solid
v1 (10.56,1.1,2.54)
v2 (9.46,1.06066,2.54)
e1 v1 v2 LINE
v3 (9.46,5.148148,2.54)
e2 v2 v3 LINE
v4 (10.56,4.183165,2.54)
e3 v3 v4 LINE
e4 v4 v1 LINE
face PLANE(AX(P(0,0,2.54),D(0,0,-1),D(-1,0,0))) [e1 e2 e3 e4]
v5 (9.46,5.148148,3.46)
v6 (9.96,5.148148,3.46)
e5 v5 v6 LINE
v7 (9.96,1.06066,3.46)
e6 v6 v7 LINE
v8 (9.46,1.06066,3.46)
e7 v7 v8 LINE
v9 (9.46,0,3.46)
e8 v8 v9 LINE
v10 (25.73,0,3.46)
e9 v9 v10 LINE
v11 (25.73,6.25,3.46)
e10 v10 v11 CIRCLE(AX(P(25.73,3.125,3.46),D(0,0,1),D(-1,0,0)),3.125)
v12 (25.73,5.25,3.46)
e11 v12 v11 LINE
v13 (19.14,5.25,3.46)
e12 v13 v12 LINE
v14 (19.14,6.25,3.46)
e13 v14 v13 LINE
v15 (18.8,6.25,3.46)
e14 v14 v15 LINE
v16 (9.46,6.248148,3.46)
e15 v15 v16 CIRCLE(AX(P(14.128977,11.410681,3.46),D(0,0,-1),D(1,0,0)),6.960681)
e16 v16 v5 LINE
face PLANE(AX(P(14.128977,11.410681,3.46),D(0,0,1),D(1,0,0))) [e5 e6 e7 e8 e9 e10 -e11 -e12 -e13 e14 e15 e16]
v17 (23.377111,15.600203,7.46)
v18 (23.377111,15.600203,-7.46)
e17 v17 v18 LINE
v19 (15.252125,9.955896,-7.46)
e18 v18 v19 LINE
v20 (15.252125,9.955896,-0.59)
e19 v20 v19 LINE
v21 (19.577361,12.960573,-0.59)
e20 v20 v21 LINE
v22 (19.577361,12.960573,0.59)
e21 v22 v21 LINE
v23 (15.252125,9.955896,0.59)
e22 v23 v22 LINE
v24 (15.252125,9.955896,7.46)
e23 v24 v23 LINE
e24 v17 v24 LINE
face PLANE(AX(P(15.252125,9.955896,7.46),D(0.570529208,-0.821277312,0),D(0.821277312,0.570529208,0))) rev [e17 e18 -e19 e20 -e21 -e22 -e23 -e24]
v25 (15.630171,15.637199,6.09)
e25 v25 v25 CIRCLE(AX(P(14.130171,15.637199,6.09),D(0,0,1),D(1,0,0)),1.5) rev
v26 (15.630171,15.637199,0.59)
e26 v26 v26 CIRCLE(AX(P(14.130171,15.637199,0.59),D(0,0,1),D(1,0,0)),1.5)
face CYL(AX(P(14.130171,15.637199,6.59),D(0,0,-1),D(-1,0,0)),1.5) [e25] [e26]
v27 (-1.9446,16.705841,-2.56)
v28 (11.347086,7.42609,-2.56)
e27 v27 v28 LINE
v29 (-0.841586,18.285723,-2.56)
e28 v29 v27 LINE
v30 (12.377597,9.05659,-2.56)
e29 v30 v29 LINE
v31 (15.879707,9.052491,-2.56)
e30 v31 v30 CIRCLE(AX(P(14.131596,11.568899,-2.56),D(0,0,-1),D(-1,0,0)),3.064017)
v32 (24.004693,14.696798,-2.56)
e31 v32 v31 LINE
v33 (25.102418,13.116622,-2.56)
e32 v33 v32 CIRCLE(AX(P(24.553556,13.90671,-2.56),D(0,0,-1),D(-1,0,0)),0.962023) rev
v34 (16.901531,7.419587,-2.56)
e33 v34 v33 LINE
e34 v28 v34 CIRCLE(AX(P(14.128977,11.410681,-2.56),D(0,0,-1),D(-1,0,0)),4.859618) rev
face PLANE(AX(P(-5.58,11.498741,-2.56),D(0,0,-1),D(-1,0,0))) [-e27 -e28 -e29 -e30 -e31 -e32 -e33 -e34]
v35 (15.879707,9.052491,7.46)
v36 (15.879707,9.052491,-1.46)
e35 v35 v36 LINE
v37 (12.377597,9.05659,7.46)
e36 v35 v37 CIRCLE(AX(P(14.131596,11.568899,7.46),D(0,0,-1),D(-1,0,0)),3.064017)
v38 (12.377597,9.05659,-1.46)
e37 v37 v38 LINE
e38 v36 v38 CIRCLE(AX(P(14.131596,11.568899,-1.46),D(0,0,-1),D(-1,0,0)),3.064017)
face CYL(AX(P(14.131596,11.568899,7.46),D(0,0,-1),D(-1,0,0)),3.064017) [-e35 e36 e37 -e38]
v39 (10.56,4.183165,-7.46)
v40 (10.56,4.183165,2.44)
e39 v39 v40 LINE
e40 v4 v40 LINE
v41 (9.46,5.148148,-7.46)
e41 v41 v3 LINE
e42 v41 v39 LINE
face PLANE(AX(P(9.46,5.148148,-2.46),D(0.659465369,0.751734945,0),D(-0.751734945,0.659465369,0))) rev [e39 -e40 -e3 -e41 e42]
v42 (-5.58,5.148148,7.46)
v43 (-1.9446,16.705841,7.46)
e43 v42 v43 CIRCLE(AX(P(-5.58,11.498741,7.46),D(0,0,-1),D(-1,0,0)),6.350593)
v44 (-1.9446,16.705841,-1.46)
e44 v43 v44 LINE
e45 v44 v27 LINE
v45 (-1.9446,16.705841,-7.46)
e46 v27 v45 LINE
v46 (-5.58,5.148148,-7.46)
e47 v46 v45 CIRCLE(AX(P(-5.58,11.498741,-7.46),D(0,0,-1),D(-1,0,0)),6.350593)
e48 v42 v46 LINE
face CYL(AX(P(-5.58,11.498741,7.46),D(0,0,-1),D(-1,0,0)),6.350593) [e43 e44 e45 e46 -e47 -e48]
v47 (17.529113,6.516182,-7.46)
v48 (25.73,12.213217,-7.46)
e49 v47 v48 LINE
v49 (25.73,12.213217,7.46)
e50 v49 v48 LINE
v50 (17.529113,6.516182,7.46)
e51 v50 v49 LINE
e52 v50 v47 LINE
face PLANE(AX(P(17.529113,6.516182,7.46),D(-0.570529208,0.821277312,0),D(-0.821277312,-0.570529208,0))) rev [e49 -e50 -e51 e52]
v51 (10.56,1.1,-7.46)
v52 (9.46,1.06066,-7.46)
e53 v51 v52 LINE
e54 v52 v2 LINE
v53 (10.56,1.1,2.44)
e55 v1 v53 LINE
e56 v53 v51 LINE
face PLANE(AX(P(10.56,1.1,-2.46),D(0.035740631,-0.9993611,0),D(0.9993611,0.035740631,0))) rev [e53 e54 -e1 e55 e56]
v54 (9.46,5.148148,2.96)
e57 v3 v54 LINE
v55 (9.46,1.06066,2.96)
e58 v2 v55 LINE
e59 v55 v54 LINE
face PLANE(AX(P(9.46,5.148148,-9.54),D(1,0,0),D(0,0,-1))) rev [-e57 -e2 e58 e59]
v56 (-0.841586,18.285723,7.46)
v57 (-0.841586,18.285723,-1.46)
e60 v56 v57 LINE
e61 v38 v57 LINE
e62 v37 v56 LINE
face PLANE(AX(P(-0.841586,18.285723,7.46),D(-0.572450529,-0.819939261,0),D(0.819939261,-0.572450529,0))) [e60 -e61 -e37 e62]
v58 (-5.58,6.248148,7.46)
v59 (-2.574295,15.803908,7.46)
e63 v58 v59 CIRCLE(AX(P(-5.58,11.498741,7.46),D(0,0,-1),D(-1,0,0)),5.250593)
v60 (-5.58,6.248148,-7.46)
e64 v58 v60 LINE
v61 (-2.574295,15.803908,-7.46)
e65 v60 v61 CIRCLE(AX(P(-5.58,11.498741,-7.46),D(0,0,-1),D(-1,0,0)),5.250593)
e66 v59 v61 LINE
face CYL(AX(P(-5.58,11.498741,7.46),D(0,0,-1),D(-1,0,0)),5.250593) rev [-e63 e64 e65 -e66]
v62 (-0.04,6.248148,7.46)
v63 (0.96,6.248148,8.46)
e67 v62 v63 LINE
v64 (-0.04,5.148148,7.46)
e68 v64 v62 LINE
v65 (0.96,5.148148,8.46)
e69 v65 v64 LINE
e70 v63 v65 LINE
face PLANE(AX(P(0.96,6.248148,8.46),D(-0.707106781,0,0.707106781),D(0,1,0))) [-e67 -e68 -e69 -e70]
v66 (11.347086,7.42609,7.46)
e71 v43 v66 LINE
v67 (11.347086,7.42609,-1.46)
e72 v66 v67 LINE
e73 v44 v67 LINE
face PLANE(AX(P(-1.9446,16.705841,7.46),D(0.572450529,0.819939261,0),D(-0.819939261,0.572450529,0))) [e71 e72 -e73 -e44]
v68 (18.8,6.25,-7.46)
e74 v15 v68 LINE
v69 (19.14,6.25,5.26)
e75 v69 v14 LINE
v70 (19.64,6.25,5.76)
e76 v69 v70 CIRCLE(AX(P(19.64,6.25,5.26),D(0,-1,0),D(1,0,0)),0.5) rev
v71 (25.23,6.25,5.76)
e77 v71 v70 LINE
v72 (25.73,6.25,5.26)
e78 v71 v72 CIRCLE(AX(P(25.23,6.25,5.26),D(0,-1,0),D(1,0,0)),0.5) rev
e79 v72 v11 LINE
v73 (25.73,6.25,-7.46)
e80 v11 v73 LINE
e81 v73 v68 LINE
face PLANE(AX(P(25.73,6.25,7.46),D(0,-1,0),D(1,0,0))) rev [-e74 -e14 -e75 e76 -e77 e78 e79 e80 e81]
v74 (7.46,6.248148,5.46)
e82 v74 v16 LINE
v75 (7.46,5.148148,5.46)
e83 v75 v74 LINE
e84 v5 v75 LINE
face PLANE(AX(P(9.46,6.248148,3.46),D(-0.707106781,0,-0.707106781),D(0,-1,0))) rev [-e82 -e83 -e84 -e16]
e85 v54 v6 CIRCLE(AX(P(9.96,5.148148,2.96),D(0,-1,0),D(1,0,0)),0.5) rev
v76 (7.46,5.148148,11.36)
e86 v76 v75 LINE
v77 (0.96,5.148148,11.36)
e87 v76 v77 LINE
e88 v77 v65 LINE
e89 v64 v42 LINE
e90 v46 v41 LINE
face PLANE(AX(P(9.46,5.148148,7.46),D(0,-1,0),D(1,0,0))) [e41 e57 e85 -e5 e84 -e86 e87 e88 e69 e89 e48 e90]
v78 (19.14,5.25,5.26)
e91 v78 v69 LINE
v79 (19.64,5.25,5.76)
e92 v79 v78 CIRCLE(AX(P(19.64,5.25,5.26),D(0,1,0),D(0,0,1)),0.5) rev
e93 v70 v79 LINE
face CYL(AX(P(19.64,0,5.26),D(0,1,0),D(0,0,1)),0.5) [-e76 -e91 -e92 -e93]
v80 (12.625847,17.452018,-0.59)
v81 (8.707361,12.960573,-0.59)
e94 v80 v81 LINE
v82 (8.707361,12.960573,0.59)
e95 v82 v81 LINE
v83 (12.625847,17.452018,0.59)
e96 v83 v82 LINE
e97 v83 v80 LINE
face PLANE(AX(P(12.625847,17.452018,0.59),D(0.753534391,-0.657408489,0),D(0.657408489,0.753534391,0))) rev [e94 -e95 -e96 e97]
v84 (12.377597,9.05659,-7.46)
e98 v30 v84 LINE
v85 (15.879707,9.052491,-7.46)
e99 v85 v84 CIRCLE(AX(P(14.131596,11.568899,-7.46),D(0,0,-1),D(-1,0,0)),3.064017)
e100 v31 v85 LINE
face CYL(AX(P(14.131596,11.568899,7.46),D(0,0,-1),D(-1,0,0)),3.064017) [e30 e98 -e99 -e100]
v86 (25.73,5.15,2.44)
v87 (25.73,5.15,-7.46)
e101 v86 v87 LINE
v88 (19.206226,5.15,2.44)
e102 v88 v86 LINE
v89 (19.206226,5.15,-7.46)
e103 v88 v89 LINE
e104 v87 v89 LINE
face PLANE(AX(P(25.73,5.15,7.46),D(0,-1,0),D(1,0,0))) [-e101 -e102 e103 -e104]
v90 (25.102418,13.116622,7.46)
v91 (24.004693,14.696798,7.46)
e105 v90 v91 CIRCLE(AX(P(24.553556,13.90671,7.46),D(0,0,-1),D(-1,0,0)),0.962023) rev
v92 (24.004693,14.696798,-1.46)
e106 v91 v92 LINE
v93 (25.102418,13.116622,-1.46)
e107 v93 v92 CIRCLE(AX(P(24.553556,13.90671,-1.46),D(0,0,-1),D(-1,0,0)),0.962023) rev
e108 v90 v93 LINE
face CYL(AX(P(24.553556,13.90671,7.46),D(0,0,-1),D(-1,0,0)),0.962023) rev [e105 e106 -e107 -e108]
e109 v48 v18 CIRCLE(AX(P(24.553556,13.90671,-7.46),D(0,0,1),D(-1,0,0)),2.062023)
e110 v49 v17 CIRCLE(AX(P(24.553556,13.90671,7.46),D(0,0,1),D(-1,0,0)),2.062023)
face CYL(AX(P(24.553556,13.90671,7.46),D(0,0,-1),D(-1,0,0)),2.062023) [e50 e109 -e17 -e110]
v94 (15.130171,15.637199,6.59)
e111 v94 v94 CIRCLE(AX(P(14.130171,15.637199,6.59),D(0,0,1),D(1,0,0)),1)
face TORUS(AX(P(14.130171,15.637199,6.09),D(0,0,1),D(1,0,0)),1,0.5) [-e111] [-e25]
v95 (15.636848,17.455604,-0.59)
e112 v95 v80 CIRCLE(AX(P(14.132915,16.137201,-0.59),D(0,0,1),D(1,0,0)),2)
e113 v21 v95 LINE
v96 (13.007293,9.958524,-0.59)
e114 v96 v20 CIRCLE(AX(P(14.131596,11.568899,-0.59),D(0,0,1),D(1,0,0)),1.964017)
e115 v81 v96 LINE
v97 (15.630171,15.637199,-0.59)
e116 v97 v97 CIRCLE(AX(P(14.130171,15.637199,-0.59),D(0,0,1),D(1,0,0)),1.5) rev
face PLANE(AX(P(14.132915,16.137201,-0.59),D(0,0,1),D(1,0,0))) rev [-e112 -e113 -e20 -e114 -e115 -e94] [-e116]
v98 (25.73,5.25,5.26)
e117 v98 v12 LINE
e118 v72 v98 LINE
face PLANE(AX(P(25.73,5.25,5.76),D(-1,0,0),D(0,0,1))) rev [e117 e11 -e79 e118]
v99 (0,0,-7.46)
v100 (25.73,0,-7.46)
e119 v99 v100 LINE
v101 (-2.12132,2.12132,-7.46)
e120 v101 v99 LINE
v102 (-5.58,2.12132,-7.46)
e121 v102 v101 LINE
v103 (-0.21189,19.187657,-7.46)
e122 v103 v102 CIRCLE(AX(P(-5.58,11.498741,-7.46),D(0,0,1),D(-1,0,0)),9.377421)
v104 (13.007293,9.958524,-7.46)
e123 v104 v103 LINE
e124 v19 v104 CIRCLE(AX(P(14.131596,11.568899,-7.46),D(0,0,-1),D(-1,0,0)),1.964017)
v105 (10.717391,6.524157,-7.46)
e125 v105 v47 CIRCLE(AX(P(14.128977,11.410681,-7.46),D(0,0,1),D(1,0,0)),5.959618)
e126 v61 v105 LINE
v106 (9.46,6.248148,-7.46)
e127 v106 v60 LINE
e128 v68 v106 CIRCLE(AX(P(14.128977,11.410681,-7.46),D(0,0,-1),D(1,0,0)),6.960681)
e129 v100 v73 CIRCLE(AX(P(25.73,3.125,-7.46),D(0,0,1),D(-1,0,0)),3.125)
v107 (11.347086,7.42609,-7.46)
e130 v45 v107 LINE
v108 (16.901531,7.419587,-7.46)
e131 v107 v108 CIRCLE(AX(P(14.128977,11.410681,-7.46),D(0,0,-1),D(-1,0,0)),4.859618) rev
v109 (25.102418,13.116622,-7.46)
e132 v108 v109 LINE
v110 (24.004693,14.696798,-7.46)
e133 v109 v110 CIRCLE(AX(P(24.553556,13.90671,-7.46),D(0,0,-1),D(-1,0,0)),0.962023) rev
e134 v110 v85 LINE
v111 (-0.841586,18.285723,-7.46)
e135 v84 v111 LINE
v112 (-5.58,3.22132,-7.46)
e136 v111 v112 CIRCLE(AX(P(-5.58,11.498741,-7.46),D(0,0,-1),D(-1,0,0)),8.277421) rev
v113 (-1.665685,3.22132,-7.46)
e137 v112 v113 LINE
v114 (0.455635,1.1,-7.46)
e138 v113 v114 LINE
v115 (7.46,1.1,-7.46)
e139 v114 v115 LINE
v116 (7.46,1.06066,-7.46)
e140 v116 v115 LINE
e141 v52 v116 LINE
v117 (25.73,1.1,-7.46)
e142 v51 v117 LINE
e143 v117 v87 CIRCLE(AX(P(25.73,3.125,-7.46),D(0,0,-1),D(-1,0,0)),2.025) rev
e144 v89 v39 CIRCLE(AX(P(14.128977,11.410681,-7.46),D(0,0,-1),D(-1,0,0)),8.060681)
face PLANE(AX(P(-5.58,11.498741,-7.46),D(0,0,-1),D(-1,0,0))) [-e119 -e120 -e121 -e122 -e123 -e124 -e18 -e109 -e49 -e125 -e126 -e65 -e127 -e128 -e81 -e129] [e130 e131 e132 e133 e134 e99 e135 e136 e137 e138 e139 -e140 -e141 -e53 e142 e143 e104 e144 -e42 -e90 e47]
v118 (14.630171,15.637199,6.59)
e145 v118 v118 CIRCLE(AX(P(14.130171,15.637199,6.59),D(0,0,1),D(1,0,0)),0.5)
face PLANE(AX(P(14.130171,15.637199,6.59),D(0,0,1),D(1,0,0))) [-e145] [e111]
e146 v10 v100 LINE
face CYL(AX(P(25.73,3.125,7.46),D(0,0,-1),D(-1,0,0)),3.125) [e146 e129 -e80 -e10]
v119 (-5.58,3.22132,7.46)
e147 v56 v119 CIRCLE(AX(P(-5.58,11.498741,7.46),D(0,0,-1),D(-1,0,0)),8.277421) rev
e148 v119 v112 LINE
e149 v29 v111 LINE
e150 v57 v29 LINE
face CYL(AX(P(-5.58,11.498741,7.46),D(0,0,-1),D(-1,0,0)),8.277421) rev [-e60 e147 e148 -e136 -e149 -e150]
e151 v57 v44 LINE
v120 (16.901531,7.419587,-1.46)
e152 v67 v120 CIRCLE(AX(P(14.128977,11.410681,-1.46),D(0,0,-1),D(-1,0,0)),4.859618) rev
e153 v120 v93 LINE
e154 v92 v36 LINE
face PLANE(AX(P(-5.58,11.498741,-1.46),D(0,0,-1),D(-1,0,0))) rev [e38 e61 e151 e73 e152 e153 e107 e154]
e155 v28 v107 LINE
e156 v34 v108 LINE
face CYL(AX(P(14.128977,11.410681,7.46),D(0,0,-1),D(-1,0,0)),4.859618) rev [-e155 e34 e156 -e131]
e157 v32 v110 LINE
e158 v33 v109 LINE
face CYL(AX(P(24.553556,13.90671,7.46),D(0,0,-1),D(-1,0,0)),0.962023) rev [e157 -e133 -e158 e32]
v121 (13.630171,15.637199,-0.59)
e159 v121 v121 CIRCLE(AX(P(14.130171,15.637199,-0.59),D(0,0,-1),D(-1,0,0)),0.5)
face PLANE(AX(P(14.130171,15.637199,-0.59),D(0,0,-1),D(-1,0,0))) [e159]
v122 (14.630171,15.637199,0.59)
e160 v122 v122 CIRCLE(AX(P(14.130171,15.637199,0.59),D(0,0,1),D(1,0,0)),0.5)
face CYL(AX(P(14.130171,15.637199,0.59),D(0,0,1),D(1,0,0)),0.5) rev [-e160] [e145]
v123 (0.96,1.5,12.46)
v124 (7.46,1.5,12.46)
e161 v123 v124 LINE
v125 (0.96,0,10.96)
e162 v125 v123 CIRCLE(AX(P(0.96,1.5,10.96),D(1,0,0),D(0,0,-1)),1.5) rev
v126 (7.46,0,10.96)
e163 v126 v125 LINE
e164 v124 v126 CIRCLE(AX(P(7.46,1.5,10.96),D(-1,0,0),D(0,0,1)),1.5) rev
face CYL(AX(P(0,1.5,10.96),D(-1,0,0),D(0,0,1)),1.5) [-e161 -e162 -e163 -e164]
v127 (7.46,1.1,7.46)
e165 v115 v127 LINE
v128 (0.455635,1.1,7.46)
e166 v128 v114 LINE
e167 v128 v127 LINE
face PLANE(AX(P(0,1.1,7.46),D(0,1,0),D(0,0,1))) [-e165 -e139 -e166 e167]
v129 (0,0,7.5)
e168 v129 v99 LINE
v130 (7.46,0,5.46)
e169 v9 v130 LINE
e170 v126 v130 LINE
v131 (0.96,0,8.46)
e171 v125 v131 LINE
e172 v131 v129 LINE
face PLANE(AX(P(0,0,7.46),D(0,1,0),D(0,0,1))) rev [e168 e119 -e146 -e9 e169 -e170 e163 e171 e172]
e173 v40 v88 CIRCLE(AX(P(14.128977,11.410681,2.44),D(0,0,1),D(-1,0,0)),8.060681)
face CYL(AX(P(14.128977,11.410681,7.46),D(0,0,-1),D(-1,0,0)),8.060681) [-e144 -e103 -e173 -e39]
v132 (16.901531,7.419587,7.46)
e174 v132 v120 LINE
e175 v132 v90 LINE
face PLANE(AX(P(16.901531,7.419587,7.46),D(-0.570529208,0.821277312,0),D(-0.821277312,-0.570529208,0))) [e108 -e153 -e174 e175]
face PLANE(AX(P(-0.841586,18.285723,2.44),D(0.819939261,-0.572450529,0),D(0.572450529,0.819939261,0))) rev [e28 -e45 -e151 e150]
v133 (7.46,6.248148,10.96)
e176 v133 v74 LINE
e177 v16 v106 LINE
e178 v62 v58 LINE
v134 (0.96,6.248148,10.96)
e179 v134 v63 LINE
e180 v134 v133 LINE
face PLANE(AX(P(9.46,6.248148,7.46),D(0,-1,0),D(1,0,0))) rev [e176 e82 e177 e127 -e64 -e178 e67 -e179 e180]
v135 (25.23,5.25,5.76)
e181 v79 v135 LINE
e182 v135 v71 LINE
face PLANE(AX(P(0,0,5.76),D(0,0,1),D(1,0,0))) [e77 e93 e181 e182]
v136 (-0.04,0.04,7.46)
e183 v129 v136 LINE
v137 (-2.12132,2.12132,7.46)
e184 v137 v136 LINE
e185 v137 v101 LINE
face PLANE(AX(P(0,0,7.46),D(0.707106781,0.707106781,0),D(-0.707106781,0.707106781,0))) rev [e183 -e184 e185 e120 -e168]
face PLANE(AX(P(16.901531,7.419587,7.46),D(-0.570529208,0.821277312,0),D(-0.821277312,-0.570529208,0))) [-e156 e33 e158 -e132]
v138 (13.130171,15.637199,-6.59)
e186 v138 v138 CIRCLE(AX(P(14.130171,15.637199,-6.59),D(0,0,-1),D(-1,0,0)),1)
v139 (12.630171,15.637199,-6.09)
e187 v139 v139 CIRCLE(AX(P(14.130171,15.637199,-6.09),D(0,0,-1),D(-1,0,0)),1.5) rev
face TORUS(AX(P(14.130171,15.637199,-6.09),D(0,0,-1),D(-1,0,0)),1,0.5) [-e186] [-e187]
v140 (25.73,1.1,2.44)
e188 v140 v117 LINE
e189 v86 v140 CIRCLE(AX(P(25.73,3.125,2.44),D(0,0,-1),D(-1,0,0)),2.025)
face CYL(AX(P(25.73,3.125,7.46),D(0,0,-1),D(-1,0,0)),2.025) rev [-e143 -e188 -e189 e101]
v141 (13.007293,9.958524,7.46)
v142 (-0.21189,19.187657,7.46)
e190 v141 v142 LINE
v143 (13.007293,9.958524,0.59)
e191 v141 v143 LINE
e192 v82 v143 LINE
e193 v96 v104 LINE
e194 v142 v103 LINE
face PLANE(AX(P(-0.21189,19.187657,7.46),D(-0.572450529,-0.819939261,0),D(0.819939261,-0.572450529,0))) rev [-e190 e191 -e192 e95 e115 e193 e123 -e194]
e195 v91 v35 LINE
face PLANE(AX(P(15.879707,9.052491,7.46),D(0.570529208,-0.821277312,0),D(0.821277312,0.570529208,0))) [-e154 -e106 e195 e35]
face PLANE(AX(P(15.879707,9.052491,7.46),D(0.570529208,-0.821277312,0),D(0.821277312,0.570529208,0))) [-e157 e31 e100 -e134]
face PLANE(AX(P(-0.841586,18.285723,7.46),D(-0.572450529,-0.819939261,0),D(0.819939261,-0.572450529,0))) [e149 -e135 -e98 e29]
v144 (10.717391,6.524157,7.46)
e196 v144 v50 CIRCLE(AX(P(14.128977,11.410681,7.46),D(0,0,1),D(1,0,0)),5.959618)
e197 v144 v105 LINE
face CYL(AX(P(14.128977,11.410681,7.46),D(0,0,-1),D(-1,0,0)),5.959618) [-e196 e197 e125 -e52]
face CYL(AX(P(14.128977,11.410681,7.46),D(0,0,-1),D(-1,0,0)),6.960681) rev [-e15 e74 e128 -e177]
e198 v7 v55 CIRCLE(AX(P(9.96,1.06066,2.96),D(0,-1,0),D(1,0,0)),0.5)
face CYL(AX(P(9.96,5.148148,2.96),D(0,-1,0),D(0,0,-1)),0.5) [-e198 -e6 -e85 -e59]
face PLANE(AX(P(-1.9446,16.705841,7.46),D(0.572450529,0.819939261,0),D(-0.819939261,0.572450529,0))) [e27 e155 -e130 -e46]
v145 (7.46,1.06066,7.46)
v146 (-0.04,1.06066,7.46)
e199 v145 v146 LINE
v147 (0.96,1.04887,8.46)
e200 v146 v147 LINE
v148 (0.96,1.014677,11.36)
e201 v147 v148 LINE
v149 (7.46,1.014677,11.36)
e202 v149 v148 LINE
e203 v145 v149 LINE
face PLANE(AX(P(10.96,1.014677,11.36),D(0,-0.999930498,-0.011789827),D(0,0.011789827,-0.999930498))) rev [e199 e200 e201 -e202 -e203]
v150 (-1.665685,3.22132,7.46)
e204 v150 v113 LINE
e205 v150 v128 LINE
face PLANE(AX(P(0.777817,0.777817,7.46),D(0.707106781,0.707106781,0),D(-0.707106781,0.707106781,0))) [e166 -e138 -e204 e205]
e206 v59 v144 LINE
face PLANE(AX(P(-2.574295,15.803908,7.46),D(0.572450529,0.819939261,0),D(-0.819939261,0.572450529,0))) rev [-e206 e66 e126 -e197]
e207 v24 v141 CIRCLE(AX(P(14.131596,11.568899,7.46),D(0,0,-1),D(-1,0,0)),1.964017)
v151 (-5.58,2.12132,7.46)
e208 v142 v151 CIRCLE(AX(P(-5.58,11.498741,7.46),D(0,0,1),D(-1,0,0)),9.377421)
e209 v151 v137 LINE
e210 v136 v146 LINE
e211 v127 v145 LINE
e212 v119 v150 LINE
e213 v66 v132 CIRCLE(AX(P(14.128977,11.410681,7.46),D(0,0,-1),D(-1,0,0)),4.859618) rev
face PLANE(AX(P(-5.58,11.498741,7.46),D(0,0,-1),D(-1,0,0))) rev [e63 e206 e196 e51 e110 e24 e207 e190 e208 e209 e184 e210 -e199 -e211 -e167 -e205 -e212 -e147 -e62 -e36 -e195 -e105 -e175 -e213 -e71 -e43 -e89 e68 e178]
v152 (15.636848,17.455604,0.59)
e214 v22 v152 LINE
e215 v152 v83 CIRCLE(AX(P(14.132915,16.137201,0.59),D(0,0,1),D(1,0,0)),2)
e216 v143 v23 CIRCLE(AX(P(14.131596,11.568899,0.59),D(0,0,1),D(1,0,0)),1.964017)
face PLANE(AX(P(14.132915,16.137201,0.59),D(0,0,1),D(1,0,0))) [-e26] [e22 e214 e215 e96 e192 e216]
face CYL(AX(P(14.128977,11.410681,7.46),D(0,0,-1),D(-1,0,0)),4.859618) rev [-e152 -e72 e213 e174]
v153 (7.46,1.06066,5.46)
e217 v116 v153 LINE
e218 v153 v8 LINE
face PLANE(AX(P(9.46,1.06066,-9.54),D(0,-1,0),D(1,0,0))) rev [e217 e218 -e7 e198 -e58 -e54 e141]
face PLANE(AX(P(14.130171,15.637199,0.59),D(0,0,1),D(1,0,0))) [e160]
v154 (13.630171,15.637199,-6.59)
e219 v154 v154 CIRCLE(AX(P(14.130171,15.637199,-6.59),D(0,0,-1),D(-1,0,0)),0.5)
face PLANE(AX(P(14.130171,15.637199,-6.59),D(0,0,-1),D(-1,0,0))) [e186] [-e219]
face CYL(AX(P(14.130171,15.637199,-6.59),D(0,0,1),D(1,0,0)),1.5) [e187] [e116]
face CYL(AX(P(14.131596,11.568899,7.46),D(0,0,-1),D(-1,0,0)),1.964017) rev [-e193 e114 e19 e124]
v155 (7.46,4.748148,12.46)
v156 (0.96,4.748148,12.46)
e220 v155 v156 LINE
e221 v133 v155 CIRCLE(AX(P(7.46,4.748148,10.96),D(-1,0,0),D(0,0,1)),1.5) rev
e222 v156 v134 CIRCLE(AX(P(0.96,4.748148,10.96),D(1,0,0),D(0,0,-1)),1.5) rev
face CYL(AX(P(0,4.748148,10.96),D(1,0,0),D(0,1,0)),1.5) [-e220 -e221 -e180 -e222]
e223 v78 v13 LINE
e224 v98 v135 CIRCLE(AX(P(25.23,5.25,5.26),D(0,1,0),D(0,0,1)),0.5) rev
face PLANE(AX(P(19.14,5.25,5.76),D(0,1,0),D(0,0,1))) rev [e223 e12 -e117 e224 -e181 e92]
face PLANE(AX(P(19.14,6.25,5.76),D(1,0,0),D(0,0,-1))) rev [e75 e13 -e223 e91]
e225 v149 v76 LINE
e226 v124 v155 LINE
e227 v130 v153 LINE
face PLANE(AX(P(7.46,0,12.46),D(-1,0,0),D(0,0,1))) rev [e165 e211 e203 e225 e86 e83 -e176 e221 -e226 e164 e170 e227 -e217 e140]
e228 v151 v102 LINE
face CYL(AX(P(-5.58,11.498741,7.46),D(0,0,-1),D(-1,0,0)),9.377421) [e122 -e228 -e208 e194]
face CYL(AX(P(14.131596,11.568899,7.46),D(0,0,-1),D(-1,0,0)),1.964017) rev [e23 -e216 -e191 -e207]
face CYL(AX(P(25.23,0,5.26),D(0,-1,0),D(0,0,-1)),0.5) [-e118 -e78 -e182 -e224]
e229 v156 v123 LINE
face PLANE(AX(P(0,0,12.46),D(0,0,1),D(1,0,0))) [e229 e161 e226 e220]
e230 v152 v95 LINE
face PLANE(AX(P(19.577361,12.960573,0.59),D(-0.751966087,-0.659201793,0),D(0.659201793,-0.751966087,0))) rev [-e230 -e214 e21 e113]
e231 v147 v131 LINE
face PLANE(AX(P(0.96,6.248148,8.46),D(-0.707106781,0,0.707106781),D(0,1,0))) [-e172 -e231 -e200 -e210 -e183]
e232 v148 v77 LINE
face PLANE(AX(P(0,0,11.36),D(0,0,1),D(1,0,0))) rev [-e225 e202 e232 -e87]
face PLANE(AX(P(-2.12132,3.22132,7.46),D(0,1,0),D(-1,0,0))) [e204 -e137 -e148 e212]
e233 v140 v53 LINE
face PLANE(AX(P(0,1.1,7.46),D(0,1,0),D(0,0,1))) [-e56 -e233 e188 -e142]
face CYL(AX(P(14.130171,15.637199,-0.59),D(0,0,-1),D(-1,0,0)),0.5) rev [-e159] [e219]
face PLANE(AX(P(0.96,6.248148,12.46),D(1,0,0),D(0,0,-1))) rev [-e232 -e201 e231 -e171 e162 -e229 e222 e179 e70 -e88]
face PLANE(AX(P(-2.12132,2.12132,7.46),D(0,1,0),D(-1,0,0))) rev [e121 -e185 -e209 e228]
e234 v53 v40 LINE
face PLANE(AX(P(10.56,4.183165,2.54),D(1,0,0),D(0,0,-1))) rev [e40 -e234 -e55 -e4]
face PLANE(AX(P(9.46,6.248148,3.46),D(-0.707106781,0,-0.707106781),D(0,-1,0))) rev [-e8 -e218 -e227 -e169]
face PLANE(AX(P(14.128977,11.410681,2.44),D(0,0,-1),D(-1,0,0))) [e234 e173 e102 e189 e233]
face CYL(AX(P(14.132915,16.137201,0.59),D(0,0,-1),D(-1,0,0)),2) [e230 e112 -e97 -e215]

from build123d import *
from build123d.topology import SkipClean

# Parameters (mm, degrees)
BOSS_EXTRUDE2_DEPTH = 7.46
BOSS_EXTRUDE3_DEPTH = 0.59
SKETCH6_R           = 1.5
BOSS_EXTRUDE5_DEPTH = 6
BOSS_EXTRUDE6_START = 6
SKETCH7_R           = 1.5
BOSS_EXTRUDE6_DEPTH = 6
SKETCH8_R           = 0.5
CUT_EXTRUDE1_DEPTH  = 6
FILLET1_R           = 0.5
CUT_EXTRUDE2_START  = -6
SKETCH9_R           = 0.5
CUT_EXTRUDE2_DEPTH  = 6
FILLET2_R           = 0.5
CUT_EXTRUDE3_DEPTH  = 4
SKETCH12_W          = 6.5
SKETCH12_H          = 6.248148488
BOSS_EXTRUDE7_DEPTH = 5
SKETCH13_W          = 6.59
SKETCH13_H          = 1
BOSS_EXTRUDE8_DEPTH = 2.3
FILLET3_R           = 0.5
FILLET4_R           = 0.5
SHELL5_START        = -1.46
SHELL5_DEPTH        = 8.92
SHELL5_2_DEPTH      = 3.82
SHELL5_START_2      = 7.46
SHELL5_3_OUTLINE_W  = 4.3
SHELL5_3_OUTLINE_H  = 4.048148488
SHELL5_3_DEPTH      = 3.9
SHELL5_START_3      = 2.36
SHELL5_4_OUTLINE_W  = 2
SHELL5_4_OUTLINE_H  = 4.048148488
SHELL5_4_DEPTH      = 4
CUT_EXTRUDE4_DEPTH  = 10
FILLET5_R           = 1.5
FILLET6_R           = 1.5
CHAMFER2_SIZE       = 1
CHAMFER3_SIZE       = 1
SKETCH17_W          = 2
SKETCH17_H          = 4.087488316
CUT_EXTRUDE5_DEPTH  = 17
SKETCH18_W          = 1.1
SKETCH18_H          = 4.048148488
CUT_EXTRUDE6_DEPTH  = 2
CHAMFER4_SIZE       = 4
FILLET7_R           = 0.5
SHELL9_START        = -7.46
SHELL9_DEPTH        = 4.9
CUT_EXTRUDE7_DEPTH  = 5
CUT_EXTRUDE8_DEPTH  = 5
SKETCH24_W          = 1.1
SKETCH24_H          = 4.048148488
CUT_EXTRUDE9_DEPTH  = 5
SKETCH25_W          = 1.1
SKETCH25_H          = 4.048148488
CUT_EXTRUDE10_DEPTH = 5
CUT_EXTRUDE11_DEPTH = 5
CUT_EXTRUDE12_DEPTH = 5
CUT_EXTRUDE13_DEPTH = 5
CHAMFER5_SIZE       = 4


# Read off the part's stored shape, not the designer's step: Shell5, Shell9
with BuildPart() as part:
    # Sketch1 → Boss-Extrude2 (new, symmetric)
    with BuildSketch(Plane.XY):
        with BuildLine():
            Line((0, 0), (25.73, 0))
            ThreePointArc((25.73, 0), (28.855, 3.125), (25.73, 6.25))
            Line((25.73, 6.25), (18.8, 6.25))
            ThreePointArc((18.8, 6.25), (14.130356731, 4.449999786), (9.460000184, 6.248148488))
            Line((9.460000184, 6.248148488), (-5.579999816, 6.248148488))
            ThreePointArc((-5.579999816, 6.248148488), (-10.588662374, 13.074184644), (-2.574295287, 15.803908151))
            Line((-2.574295287, 15.803908151), (10.717390583, 6.524156616))
            ThreePointArc((10.717390583, 6.524156616), (14.122000147, 5.451067533), (17.52911284, 6.516182343))
            Line((17.52911284, 6.516182343), (25.73, 12.213217424))
            ThreePointArc((25.73, 12.213217424), (26.24704842, 15.08315483), (23.377111014, 15.60020325))
            Line((23.377111014, 15.60020325), (15.252125086, 9.955895634))
            ThreePointArc((15.252125086, 9.955895634), (14.129296564, 9.604882504), (13.007292958, 9.958523589))
            Line((13.007292958, 9.958523589), (-0.211890331, 19.187656569))
            ThreePointArc((-0.211890331, 19.187656569), (-14.525339827, 14.312441954), (-5.579999816, 2.121320344))
            Line((-5.579999816, 2.121320344), (-2.121320344, 2.121320344))
            Line((-2.121320344, 2.121320344), (0, 0))
        make_face()
    extrude(amount=BOSS_EXTRUDE2_DEPTH, both=True)

    # Sketch4 → Boss-Extrude3 (add, symmetric)
    with BuildSketch(Plane.XY):
        with BuildLine():
            Line((19.577361072, 12.960573135), (15.636847625, 17.455604109))
            ThreePointArc((15.636847625, 17.455604109), (14.130533117, 18.137199105), (12.625846669, 17.452017503))
            Line((12.625846669, 17.452017503), (8.707361072, 12.960573135))
            Line((8.707361072, 12.960573135), (13.007292958, 9.958523589))
            ThreePointArc((13.007292958, 9.958523589), (14.129296564, 9.604882504), (15.252125086, 9.955895634))
            Line((15.252125086, 9.955895634), (19.577361072, 12.960573135))
        make_face()
    extrude(amount=BOSS_EXTRUDE3_DEPTH, both=True)

    # Sketch6 → Boss-Extrude5 (add)
    with BuildSketch(Plane.XY.offset(0.59)):
        with Locations((14.130170803, 15.637199105)):
            Circle(SKETCH6_R)
    extrude(amount=BOSS_EXTRUDE5_DEPTH)

    # Sketch7 → Boss-Extrude6 (add)
    with BuildSketch(Plane(origin=(0, 0, -0.59), x_dir=(-1, 0, 0), z_dir=(0, 0, -1)).offset(BOSS_EXTRUDE6_START)):
        with Locations(Location((-14.130170803, 15.637199105, 0), (0, 0, 180))):
            Circle(SKETCH7_R)
    extrude(amount=-BOSS_EXTRUDE6_DEPTH)

    # Sketch8 → Cut-Extrude1 (cut)
    with BuildSketch(Plane(origin=(0, 0, -6.59), x_dir=(-1, 0, 0), z_dir=(0, 0, -1))):
        with Locations((-14.130170803, 15.637199105)):
            Circle(SKETCH8_R)
    extrude(amount=-CUT_EXTRUDE1_DEPTH, mode=Mode.SUBTRACT)

    # Fillet1
    fillet1_edges = [part.edges().sort_by_distance(p)[0] for p in [
        (12.630170803, 15.637199105, -6.59),
    ]]
    fillet(fillet1_edges, radius=FILLET1_R)

    # Sketch9 → Cut-Extrude2 (cut)
    with BuildSketch(Plane.XY.offset(6.59).offset(CUT_EXTRUDE2_START)):
        with Locations(Location((14.130170803, 15.637199105, 0), (0, 0, 180))):
            Circle(SKETCH9_R)
    extrude(amount=CUT_EXTRUDE2_DEPTH, mode=Mode.SUBTRACT)

    # Fillet2
    fillet2_edges = [part.edges().sort_by_distance(p)[0] for p in [
        (12.630170803, 15.637199105, 6.59),
    ]]
    fillet(fillet2_edges, radius=FILLET2_R)

    # Sketch11 → Cut-Extrude3 (cut)
    with BuildSketch(Plane.XY.offset(7.46)):
        with BuildLine():
            Line((9.460000184, 6.248148488), (9.460000184, 0))
            Line((9.460000184, 0), (25.73, 0))
            ThreePointArc((25.73, 0), (28.855, 3.125), (25.73, 6.25))
            Line((25.73, 6.25), (18.8, 6.25))
            ThreePointArc((18.8, 6.25), (14.130356731, 4.449999786), (9.460000184, 6.248148488))
        make_face()
    extrude(amount=-CUT_EXTRUDE3_DEPTH, mode=Mode.SUBTRACT)

    # Sketch12 → Boss-Extrude7 (add)
    with BuildSketch(Plane.XY.offset(7.46)):
        with Locations((4.210000184, 3.124074244)):
            Rectangle(SKETCH12_W, SKETCH12_H)
    extrude(amount=BOSS_EXTRUDE7_DEPTH)

    # Sketch13 → Boss-Extrude8 (add)
    with BuildSketch(Plane.XY.offset(3.46)):
        with Locations((22.435, 5.75)):
            Rectangle(SKETCH13_W, SKETCH13_H)
    extrude(amount=BOSS_EXTRUDE8_DEPTH)

    # Fillet3
    fillet3_edges = [part.edges().sort_by_distance(p)[0] for p in [
        (25.73, 5.75, 5.76),
    ]]
    fillet(fillet3_edges, radius=FILLET3_R)

    # Fillet4
    fillet4_edges = [part.edges().sort_by_distance(p)[0] for p in [
        (19.14, 5.75, 5.76),
    ]]
    fillet(fillet4_edges, radius=FILLET4_R)

    # Shell5 outline → Shell5 (cut)
    with BuildSketch(Plane.XY.offset(SHELL5_START)):
        with BuildLine():
            Line((6.360000184, 1.1), (6.360000184, 5.148148488))
            Line((6.360000184, 5.148148488), (-5.579999816, 5.148148488))
            ThreePointArc((-5.579999816, 5.148148488), (-11.637977986, 13.404240317), (-1.944599705, 16.705841338))
            Line((-1.944599705, 16.705841338), (11.347086166, 7.426089803))
            ThreePointArc((11.347086166, 7.426089803), (14.123287882, 6.55106678), (16.901530711, 7.419587386))
            Line((16.901530711, 7.419587386), (25.102417871, 13.116622467))
            ThreePointArc((25.102417871, 13.116622467), (25.343643378, 14.455572701), (24.004693143, 14.696798207))
            Line((24.004693143, 14.696798207), (15.879707215, 9.052490591))
            ThreePointArc((15.879707215, 9.052490591), (14.128008829, 8.504883258), (12.377597376, 9.056590402))
            Line((12.377597376, 9.056590402), (-0.841585914, 18.285723382))
            ThreePointArc((-0.841585914, 18.285723382), (-13.476024215, 13.98238628), (-5.579999816, 3.221320344))
            Line((-5.579999816, 3.221320344), (-1.665685425, 3.221320344))
            Line((-1.665685425, 3.221320344), (0.455634919, 1.1))
            Line((0.455634919, 1.1), (6.360000184, 1.1))
        make_face()
    extrude(amount=SHELL5_DEPTH, mode=Mode.SUBTRACT)

    # Shell5 2 outline → Shell5 2 (cut)
    with BuildSketch(Plane.XY.offset(SHELL5_START)):
        with BuildLine():
            ThreePointArc((25.73, 1.1), (27.755, 3.125), (25.73, 5.15))
            Line((25.73, 5.15), (19.206225915, 5.15))
            ThreePointArc((19.206225915, 5.15), (14.130446951, 3.349999783), (9.054011773, 5.148148488))
            Line((9.054011773, 5.148148488), (6.360000184, 5.148148488))
            Line((6.360000184, 5.148148488), (6.360000184, 1.1))
            Line((6.360000184, 1.1), (25.73, 1.1))
        make_face()
    extrude(amount=SHELL5_2_DEPTH, mode=Mode.SUBTRACT)

    # Shell5 3 outline → Shell5 3 (cut)
    with BuildSketch(Plane.XY.offset(SHELL5_START_2)):
        with Locations((4.210000184, 3.124074244)):
            Rectangle(SHELL5_3_OUTLINE_W, SHELL5_3_OUTLINE_H)
    extrude(amount=SHELL5_3_DEPTH, mode=Mode.SUBTRACT)

    # Shell5 4 outline → Shell5 4 (cut)
    with BuildSketch(Plane.XY.offset(SHELL5_START_3)):
        with Locations((7.360000184, 3.124074244)):
            Rectangle(SHELL5_4_OUTLINE_W, SHELL5_4_OUTLINE_H)
    extrude(amount=SHELL5_4_DEPTH, mode=Mode.SUBTRACT)

    # Sketch16 → Cut-Extrude4 (cut)
    with BuildSketch(Plane.ZY.offset(-0.960000184)):
        Polygon((7.93704162, 5.148148488), (11.36, 5.148148488), (11.36, 1.014676652), (7.46, 1.060660172), (7.46, 5.148148488), align=None)
    extrude(amount=-CUT_EXTRUDE4_DEPTH, mode=Mode.SUBTRACT)

    # Fillet5
    fillet5_edges = [part.edges().sort_by_distance(p)[0] for p in [
        (4.210000184, 6.248148488, 12.46),
    ]]
    fillet(fillet5_edges, radius=FILLET5_R)

    # Fillet6
    fillet6_edges = [part.edges().sort_by_distance(p)[0] for p in [
        (4.210000184, 0, 12.46),
    ]]
    fillet(fillet6_edges, radius=FILLET6_R)

    # Chamfer2
    chamfer2_edges = [part.edges().sort_by_distance(p)[0] for p in [
        (0.960000184, 5.698148488, 7.46),
    ]]
    chamfer(chamfer2_edges, length=CHAMFER2_SIZE)

    # Chamfer3
    chamfer3_edges = [part.edges().sort_by_distance(p)[0] for p in [
        (0.960000184, 0.530330086, 7.46),
    ]]
    chamfer(chamfer3_edges, length=CHAMFER3_SIZE)

    # Sketch17 → Cut-Extrude5 (cut)
    with BuildSketch(Plane.XY.offset(7.46)):
        with Locations((8.460000184, 3.10440433)):
            Rectangle(SKETCH17_W, SKETCH17_H)
    extrude(amount=-CUT_EXTRUDE5_DEPTH, mode=Mode.SUBTRACT)

    # Sketch18 → Cut-Extrude6 (cut)
    with BuildSketch(Plane(origin=(7.460000184, 0, 0), x_dir=(0, 0, -1), z_dir=(1, 0, 0))):
        with Locations((-6.91, 3.124074244)):
            Rectangle(SKETCH18_W, SKETCH18_H)
    extrude(amount=-CUT_EXTRUDE6_DEPTH, mode=Mode.SUBTRACT)

    # Chamfer4
    # the kernel refuses this chamfer: 4 mm, written as the material it takes off along each edge
    with BuildSketch(Plane(origin=(9.460000184, 11.347392124, 7.46), x_dir=(0.027495876610586487, 0, -0.9996219169112968), z_dir=(0, -1, 0))) as chamfer4_piece_1_section:
        Polygon((CHAMFER4_SIZE * 0.999621916911, -CHAMFER4_SIZE * 0.0274958766106), (-CHAMFER4_SIZE * 0.0274958766106, -CHAMFER4_SIZE * 0.999621916911), (0, 0), align=None)
    chamfer4_piece_1 = extrude(amount=21.634124076, mode=Mode.PRIVATE)
    chamfer4_piece_1 = split(chamfer4_piece_1, bisect_by=Plane(origin=(7.460000184, 0.530330086, 5.904444444), z_dir=(1, 0, 0)), keep=Keep.TOP, mode=Mode.PRIVATE)
    chamfer4_piece_1 = split(chamfer4_piece_1, bisect_by=Plane(origin=(8.571111295, 1.078924912, 5.910912732), z_dir=(0, -0.9999304975787501, -0.011789826627795805)), keep=Keep.TOP, mode=Mode.PRIVATE)
    add(chamfer4_piece_1, mode=Mode.SUBTRACT)

    # Fillet7
    fillet7_edges = [part.edges().sort_by_distance(p)[0] for p in [
        (9.460000184, 3.10440433, 3.46),
    ]]
    fillet(fillet7_edges, radius=FILLET7_R)

    # Shell9 outline → Shell9 (cut)
    with BuildSketch(Plane.XY.offset(SHELL9_START)):
        with BuildLine():
            Line((0.455634919, 1.1), (6.360000184, 1.1))
            Line((6.360000184, 1.1), (6.360000184, 5.148148488))
            Line((6.360000184, 5.148148488), (-5.579999816, 5.148148488))
            ThreePointArc((-5.579999816, 5.148148488), (-11.637977986, 13.404240317), (-1.944599705, 16.705841338))
            Line((-1.944599705, 16.705841338), (11.347086166, 7.426089803))
            ThreePointArc((11.347086166, 7.426089803), (14.123287882, 6.55106678), (16.901530711, 7.419587386))
            Line((16.901530711, 7.419587386), (25.102417871, 13.116622467))
            ThreePointArc((25.102417871, 13.116622467), (25.343643378, 14.455572701), (24.004693143, 14.696798207))
            Line((24.004693143, 14.696798207), (15.879707215, 9.052490591))
            ThreePointArc((15.879707215, 9.052490591), (14.128008829, 8.504883258), (12.377597376, 9.056590402))
            Line((12.377597376, 9.056590402), (-0.841585914, 18.285723382))
            ThreePointArc((-0.841585914, 18.285723382), (-13.476024215, 13.98238628), (-5.579999816, 3.221320344))
            Line((-5.579999816, 3.221320344), (-1.665685425, 3.221320344))
            Line((-1.665685425, 3.221320344), (0.455634919, 1.1))
        make_face()
        with BuildLine():
            Line((10.560000184, 1.1), (25.73, 1.1))
            ThreePointArc((25.73, 1.1), (27.755, 3.125), (25.73, 5.15))
            Line((25.73, 5.15), (19.206225915, 5.15))
            ThreePointArc((19.206225915, 5.15), (15.024752468, 3.399927605), (10.560000184, 4.183164872))
            Line((10.560000184, 4.183164872), (10.560000184, 1.1))
        make_face()
    extrude(amount=SHELL9_DEPTH, mode=Mode.SUBTRACT)

    # Sketch20 → Cut-Extrude7 (cut)
    with BuildSketch(Plane(origin=(0, 0, -2.56), x_dir=(-1, 0, 0), z_dir=(0, 0, -1))):
        with BuildLine():
            Line((-19.206225915, 5.15), (-25.73, 5.15))
            ThreePointArc((-25.73, 5.15), (-27.755, 3.125), (-25.73, 1.1))
            Line((-25.73, 1.1), (-10.560000184, 1.1))
            Line((-10.560000184, 1.1), (-10.560000184, 4.183164872))
            ThreePointArc((-10.560000184, 4.183164872), (-15.024752468, 3.399927605), (-19.206225915, 5.15))
        make_face()
    extrude(amount=-CUT_EXTRUDE7_DEPTH, mode=Mode.SUBTRACT)

    # Sketch23 → Cut-Extrude8 (cut)
    with BuildSketch(Plane(origin=(0, 0, -2.56), x_dir=(-1, 0, 0), z_dir=(0, 0, -1))):
        Polygon((-6.360000184, 5.148148488), (-6.360000184, 1.1), (-0.455634919, 1.1), (-0.390000184, 5.148148488), align=None)
    extrude(amount=-CUT_EXTRUDE8_DEPTH, mode=Mode.SUBTRACT)

    # Sketch24 → Cut-Extrude9 (cut)
    with BuildSketch(Plane(origin=(0, 0, -7.46), x_dir=(-1, 0, 0), z_dir=(0, 0, -1))):
        with Locations((-6.910000184, 3.124074244)):
            Rectangle(SKETCH24_W, SKETCH24_H)
    extrude(amount=-CUT_EXTRUDE9_DEPTH, mode=Mode.SUBTRACT)

    # Sketch25 → Cut-Extrude10 (cut)
    with BuildSketch(Plane(origin=(0, 0, -2.46), x_dir=(-1, 0, 0), z_dir=(0, 0, -1))):
        with Locations((-6.910000184, 3.124074244)):
            Rectangle(SKETCH25_W, SKETCH25_H)
    extrude(amount=-CUT_EXTRUDE10_DEPTH, mode=Mode.SUBTRACT)

    # Sketch27 → Cut-Extrude11 (cut)
    with SkipClean():  # the faces are left unmerged after this step: merging them gives an invalid solid
        with BuildSketch(Plane(origin=(0, 0, -2.56), x_dir=(-1, 0, 0), z_dir=(0, 0, -1))):
            with BuildLine():
                Line((0.841585914, 18.285723382), (1.944599705, 16.705841338))
                ThreePointArc((1.944599705, 16.705841338), (11.637977986, 13.404240317), (5.579999816, 5.148148488))
                Line((5.579999816, 5.148148488), (-0.390000184, 5.148148488))
                Line((-0.390000184, 5.148148488), (-0.455634919, 1.1))
                Line((-0.455634919, 1.1), (1.665685425, 3.221320344))
                Line((1.665685425, 3.221320344), (5.579999816, 3.221320344))
                ThreePointArc((5.579999816, 3.221320344), (13.476024215, 13.982386281), (0.841585914, 18.285723382))
            make_face()
        extrude(amount=-CUT_EXTRUDE11_DEPTH, mode=Mode.SUBTRACT)
    add(part.part.scale(1), mode=Mode.REPLACE)  # the faces are merged on a copy

    # Sketch28 → Cut-Extrude12 (cut)
    with BuildSketch(Plane(origin=(0, 0, -7.46), x_dir=(-1, 0, 0), z_dir=(0, 0, -1))):
        Polygon((-10.560000184, 4.183164872), (-10.560000184, 1.1), (-9.460000184, 1.060660172), (-9.460000184, 5.148148488), align=None)
    extrude(amount=-CUT_EXTRUDE12_DEPTH, mode=Mode.SUBTRACT)

    # Sketch29 → Cut-Extrude13 (cut)
    with BuildSketch(Plane(origin=(0, 0, -2.46), x_dir=(-1, 0, 0), z_dir=(0, 0, -1))):
        Polygon((-9.460000184, 1.060660172), (-9.460000184, 5.148148488), (-10.560000184, 4.183164872), (-10.560000184, 1.1), align=None)
    extrude(amount=-CUT_EXTRUDE13_DEPTH, mode=Mode.SUBTRACT)

    # Chamfer5
    # the kernel refuses this chamfer: 4 mm, written as the material it takes off along each edge
    with BuildSketch(Plane(origin=(9.460000184, 6.248148488, 7.46), x_dir=(-0.9996219169112968, 0, 0.027495876610586275), z_dir=(0, -1, 0))) as chamfer5_piece_1_section:
        Polygon((CHAMFER5_SIZE * 0.999621916911, CHAMFER5_SIZE * 0.0274958766106), (-CHAMFER5_SIZE * 0.0274958766106, CHAMFER5_SIZE * 0.999621916911), (0, 0), align=None)
    chamfer5_piece_1 = extrude(amount=11.386731952, mode=Mode.PRIVATE)
    chamfer5_piece_1 = split(chamfer5_piece_1, bisect_by=Plane(origin=(7.460000184, 5.698148488, 5.904444444), z_dir=(1, 0, 0)), keep=Keep.TOP, mode=Mode.PRIVATE)
    add(chamfer5_piece_1, mode=Mode.SUBTRACT)


solid = part.part
